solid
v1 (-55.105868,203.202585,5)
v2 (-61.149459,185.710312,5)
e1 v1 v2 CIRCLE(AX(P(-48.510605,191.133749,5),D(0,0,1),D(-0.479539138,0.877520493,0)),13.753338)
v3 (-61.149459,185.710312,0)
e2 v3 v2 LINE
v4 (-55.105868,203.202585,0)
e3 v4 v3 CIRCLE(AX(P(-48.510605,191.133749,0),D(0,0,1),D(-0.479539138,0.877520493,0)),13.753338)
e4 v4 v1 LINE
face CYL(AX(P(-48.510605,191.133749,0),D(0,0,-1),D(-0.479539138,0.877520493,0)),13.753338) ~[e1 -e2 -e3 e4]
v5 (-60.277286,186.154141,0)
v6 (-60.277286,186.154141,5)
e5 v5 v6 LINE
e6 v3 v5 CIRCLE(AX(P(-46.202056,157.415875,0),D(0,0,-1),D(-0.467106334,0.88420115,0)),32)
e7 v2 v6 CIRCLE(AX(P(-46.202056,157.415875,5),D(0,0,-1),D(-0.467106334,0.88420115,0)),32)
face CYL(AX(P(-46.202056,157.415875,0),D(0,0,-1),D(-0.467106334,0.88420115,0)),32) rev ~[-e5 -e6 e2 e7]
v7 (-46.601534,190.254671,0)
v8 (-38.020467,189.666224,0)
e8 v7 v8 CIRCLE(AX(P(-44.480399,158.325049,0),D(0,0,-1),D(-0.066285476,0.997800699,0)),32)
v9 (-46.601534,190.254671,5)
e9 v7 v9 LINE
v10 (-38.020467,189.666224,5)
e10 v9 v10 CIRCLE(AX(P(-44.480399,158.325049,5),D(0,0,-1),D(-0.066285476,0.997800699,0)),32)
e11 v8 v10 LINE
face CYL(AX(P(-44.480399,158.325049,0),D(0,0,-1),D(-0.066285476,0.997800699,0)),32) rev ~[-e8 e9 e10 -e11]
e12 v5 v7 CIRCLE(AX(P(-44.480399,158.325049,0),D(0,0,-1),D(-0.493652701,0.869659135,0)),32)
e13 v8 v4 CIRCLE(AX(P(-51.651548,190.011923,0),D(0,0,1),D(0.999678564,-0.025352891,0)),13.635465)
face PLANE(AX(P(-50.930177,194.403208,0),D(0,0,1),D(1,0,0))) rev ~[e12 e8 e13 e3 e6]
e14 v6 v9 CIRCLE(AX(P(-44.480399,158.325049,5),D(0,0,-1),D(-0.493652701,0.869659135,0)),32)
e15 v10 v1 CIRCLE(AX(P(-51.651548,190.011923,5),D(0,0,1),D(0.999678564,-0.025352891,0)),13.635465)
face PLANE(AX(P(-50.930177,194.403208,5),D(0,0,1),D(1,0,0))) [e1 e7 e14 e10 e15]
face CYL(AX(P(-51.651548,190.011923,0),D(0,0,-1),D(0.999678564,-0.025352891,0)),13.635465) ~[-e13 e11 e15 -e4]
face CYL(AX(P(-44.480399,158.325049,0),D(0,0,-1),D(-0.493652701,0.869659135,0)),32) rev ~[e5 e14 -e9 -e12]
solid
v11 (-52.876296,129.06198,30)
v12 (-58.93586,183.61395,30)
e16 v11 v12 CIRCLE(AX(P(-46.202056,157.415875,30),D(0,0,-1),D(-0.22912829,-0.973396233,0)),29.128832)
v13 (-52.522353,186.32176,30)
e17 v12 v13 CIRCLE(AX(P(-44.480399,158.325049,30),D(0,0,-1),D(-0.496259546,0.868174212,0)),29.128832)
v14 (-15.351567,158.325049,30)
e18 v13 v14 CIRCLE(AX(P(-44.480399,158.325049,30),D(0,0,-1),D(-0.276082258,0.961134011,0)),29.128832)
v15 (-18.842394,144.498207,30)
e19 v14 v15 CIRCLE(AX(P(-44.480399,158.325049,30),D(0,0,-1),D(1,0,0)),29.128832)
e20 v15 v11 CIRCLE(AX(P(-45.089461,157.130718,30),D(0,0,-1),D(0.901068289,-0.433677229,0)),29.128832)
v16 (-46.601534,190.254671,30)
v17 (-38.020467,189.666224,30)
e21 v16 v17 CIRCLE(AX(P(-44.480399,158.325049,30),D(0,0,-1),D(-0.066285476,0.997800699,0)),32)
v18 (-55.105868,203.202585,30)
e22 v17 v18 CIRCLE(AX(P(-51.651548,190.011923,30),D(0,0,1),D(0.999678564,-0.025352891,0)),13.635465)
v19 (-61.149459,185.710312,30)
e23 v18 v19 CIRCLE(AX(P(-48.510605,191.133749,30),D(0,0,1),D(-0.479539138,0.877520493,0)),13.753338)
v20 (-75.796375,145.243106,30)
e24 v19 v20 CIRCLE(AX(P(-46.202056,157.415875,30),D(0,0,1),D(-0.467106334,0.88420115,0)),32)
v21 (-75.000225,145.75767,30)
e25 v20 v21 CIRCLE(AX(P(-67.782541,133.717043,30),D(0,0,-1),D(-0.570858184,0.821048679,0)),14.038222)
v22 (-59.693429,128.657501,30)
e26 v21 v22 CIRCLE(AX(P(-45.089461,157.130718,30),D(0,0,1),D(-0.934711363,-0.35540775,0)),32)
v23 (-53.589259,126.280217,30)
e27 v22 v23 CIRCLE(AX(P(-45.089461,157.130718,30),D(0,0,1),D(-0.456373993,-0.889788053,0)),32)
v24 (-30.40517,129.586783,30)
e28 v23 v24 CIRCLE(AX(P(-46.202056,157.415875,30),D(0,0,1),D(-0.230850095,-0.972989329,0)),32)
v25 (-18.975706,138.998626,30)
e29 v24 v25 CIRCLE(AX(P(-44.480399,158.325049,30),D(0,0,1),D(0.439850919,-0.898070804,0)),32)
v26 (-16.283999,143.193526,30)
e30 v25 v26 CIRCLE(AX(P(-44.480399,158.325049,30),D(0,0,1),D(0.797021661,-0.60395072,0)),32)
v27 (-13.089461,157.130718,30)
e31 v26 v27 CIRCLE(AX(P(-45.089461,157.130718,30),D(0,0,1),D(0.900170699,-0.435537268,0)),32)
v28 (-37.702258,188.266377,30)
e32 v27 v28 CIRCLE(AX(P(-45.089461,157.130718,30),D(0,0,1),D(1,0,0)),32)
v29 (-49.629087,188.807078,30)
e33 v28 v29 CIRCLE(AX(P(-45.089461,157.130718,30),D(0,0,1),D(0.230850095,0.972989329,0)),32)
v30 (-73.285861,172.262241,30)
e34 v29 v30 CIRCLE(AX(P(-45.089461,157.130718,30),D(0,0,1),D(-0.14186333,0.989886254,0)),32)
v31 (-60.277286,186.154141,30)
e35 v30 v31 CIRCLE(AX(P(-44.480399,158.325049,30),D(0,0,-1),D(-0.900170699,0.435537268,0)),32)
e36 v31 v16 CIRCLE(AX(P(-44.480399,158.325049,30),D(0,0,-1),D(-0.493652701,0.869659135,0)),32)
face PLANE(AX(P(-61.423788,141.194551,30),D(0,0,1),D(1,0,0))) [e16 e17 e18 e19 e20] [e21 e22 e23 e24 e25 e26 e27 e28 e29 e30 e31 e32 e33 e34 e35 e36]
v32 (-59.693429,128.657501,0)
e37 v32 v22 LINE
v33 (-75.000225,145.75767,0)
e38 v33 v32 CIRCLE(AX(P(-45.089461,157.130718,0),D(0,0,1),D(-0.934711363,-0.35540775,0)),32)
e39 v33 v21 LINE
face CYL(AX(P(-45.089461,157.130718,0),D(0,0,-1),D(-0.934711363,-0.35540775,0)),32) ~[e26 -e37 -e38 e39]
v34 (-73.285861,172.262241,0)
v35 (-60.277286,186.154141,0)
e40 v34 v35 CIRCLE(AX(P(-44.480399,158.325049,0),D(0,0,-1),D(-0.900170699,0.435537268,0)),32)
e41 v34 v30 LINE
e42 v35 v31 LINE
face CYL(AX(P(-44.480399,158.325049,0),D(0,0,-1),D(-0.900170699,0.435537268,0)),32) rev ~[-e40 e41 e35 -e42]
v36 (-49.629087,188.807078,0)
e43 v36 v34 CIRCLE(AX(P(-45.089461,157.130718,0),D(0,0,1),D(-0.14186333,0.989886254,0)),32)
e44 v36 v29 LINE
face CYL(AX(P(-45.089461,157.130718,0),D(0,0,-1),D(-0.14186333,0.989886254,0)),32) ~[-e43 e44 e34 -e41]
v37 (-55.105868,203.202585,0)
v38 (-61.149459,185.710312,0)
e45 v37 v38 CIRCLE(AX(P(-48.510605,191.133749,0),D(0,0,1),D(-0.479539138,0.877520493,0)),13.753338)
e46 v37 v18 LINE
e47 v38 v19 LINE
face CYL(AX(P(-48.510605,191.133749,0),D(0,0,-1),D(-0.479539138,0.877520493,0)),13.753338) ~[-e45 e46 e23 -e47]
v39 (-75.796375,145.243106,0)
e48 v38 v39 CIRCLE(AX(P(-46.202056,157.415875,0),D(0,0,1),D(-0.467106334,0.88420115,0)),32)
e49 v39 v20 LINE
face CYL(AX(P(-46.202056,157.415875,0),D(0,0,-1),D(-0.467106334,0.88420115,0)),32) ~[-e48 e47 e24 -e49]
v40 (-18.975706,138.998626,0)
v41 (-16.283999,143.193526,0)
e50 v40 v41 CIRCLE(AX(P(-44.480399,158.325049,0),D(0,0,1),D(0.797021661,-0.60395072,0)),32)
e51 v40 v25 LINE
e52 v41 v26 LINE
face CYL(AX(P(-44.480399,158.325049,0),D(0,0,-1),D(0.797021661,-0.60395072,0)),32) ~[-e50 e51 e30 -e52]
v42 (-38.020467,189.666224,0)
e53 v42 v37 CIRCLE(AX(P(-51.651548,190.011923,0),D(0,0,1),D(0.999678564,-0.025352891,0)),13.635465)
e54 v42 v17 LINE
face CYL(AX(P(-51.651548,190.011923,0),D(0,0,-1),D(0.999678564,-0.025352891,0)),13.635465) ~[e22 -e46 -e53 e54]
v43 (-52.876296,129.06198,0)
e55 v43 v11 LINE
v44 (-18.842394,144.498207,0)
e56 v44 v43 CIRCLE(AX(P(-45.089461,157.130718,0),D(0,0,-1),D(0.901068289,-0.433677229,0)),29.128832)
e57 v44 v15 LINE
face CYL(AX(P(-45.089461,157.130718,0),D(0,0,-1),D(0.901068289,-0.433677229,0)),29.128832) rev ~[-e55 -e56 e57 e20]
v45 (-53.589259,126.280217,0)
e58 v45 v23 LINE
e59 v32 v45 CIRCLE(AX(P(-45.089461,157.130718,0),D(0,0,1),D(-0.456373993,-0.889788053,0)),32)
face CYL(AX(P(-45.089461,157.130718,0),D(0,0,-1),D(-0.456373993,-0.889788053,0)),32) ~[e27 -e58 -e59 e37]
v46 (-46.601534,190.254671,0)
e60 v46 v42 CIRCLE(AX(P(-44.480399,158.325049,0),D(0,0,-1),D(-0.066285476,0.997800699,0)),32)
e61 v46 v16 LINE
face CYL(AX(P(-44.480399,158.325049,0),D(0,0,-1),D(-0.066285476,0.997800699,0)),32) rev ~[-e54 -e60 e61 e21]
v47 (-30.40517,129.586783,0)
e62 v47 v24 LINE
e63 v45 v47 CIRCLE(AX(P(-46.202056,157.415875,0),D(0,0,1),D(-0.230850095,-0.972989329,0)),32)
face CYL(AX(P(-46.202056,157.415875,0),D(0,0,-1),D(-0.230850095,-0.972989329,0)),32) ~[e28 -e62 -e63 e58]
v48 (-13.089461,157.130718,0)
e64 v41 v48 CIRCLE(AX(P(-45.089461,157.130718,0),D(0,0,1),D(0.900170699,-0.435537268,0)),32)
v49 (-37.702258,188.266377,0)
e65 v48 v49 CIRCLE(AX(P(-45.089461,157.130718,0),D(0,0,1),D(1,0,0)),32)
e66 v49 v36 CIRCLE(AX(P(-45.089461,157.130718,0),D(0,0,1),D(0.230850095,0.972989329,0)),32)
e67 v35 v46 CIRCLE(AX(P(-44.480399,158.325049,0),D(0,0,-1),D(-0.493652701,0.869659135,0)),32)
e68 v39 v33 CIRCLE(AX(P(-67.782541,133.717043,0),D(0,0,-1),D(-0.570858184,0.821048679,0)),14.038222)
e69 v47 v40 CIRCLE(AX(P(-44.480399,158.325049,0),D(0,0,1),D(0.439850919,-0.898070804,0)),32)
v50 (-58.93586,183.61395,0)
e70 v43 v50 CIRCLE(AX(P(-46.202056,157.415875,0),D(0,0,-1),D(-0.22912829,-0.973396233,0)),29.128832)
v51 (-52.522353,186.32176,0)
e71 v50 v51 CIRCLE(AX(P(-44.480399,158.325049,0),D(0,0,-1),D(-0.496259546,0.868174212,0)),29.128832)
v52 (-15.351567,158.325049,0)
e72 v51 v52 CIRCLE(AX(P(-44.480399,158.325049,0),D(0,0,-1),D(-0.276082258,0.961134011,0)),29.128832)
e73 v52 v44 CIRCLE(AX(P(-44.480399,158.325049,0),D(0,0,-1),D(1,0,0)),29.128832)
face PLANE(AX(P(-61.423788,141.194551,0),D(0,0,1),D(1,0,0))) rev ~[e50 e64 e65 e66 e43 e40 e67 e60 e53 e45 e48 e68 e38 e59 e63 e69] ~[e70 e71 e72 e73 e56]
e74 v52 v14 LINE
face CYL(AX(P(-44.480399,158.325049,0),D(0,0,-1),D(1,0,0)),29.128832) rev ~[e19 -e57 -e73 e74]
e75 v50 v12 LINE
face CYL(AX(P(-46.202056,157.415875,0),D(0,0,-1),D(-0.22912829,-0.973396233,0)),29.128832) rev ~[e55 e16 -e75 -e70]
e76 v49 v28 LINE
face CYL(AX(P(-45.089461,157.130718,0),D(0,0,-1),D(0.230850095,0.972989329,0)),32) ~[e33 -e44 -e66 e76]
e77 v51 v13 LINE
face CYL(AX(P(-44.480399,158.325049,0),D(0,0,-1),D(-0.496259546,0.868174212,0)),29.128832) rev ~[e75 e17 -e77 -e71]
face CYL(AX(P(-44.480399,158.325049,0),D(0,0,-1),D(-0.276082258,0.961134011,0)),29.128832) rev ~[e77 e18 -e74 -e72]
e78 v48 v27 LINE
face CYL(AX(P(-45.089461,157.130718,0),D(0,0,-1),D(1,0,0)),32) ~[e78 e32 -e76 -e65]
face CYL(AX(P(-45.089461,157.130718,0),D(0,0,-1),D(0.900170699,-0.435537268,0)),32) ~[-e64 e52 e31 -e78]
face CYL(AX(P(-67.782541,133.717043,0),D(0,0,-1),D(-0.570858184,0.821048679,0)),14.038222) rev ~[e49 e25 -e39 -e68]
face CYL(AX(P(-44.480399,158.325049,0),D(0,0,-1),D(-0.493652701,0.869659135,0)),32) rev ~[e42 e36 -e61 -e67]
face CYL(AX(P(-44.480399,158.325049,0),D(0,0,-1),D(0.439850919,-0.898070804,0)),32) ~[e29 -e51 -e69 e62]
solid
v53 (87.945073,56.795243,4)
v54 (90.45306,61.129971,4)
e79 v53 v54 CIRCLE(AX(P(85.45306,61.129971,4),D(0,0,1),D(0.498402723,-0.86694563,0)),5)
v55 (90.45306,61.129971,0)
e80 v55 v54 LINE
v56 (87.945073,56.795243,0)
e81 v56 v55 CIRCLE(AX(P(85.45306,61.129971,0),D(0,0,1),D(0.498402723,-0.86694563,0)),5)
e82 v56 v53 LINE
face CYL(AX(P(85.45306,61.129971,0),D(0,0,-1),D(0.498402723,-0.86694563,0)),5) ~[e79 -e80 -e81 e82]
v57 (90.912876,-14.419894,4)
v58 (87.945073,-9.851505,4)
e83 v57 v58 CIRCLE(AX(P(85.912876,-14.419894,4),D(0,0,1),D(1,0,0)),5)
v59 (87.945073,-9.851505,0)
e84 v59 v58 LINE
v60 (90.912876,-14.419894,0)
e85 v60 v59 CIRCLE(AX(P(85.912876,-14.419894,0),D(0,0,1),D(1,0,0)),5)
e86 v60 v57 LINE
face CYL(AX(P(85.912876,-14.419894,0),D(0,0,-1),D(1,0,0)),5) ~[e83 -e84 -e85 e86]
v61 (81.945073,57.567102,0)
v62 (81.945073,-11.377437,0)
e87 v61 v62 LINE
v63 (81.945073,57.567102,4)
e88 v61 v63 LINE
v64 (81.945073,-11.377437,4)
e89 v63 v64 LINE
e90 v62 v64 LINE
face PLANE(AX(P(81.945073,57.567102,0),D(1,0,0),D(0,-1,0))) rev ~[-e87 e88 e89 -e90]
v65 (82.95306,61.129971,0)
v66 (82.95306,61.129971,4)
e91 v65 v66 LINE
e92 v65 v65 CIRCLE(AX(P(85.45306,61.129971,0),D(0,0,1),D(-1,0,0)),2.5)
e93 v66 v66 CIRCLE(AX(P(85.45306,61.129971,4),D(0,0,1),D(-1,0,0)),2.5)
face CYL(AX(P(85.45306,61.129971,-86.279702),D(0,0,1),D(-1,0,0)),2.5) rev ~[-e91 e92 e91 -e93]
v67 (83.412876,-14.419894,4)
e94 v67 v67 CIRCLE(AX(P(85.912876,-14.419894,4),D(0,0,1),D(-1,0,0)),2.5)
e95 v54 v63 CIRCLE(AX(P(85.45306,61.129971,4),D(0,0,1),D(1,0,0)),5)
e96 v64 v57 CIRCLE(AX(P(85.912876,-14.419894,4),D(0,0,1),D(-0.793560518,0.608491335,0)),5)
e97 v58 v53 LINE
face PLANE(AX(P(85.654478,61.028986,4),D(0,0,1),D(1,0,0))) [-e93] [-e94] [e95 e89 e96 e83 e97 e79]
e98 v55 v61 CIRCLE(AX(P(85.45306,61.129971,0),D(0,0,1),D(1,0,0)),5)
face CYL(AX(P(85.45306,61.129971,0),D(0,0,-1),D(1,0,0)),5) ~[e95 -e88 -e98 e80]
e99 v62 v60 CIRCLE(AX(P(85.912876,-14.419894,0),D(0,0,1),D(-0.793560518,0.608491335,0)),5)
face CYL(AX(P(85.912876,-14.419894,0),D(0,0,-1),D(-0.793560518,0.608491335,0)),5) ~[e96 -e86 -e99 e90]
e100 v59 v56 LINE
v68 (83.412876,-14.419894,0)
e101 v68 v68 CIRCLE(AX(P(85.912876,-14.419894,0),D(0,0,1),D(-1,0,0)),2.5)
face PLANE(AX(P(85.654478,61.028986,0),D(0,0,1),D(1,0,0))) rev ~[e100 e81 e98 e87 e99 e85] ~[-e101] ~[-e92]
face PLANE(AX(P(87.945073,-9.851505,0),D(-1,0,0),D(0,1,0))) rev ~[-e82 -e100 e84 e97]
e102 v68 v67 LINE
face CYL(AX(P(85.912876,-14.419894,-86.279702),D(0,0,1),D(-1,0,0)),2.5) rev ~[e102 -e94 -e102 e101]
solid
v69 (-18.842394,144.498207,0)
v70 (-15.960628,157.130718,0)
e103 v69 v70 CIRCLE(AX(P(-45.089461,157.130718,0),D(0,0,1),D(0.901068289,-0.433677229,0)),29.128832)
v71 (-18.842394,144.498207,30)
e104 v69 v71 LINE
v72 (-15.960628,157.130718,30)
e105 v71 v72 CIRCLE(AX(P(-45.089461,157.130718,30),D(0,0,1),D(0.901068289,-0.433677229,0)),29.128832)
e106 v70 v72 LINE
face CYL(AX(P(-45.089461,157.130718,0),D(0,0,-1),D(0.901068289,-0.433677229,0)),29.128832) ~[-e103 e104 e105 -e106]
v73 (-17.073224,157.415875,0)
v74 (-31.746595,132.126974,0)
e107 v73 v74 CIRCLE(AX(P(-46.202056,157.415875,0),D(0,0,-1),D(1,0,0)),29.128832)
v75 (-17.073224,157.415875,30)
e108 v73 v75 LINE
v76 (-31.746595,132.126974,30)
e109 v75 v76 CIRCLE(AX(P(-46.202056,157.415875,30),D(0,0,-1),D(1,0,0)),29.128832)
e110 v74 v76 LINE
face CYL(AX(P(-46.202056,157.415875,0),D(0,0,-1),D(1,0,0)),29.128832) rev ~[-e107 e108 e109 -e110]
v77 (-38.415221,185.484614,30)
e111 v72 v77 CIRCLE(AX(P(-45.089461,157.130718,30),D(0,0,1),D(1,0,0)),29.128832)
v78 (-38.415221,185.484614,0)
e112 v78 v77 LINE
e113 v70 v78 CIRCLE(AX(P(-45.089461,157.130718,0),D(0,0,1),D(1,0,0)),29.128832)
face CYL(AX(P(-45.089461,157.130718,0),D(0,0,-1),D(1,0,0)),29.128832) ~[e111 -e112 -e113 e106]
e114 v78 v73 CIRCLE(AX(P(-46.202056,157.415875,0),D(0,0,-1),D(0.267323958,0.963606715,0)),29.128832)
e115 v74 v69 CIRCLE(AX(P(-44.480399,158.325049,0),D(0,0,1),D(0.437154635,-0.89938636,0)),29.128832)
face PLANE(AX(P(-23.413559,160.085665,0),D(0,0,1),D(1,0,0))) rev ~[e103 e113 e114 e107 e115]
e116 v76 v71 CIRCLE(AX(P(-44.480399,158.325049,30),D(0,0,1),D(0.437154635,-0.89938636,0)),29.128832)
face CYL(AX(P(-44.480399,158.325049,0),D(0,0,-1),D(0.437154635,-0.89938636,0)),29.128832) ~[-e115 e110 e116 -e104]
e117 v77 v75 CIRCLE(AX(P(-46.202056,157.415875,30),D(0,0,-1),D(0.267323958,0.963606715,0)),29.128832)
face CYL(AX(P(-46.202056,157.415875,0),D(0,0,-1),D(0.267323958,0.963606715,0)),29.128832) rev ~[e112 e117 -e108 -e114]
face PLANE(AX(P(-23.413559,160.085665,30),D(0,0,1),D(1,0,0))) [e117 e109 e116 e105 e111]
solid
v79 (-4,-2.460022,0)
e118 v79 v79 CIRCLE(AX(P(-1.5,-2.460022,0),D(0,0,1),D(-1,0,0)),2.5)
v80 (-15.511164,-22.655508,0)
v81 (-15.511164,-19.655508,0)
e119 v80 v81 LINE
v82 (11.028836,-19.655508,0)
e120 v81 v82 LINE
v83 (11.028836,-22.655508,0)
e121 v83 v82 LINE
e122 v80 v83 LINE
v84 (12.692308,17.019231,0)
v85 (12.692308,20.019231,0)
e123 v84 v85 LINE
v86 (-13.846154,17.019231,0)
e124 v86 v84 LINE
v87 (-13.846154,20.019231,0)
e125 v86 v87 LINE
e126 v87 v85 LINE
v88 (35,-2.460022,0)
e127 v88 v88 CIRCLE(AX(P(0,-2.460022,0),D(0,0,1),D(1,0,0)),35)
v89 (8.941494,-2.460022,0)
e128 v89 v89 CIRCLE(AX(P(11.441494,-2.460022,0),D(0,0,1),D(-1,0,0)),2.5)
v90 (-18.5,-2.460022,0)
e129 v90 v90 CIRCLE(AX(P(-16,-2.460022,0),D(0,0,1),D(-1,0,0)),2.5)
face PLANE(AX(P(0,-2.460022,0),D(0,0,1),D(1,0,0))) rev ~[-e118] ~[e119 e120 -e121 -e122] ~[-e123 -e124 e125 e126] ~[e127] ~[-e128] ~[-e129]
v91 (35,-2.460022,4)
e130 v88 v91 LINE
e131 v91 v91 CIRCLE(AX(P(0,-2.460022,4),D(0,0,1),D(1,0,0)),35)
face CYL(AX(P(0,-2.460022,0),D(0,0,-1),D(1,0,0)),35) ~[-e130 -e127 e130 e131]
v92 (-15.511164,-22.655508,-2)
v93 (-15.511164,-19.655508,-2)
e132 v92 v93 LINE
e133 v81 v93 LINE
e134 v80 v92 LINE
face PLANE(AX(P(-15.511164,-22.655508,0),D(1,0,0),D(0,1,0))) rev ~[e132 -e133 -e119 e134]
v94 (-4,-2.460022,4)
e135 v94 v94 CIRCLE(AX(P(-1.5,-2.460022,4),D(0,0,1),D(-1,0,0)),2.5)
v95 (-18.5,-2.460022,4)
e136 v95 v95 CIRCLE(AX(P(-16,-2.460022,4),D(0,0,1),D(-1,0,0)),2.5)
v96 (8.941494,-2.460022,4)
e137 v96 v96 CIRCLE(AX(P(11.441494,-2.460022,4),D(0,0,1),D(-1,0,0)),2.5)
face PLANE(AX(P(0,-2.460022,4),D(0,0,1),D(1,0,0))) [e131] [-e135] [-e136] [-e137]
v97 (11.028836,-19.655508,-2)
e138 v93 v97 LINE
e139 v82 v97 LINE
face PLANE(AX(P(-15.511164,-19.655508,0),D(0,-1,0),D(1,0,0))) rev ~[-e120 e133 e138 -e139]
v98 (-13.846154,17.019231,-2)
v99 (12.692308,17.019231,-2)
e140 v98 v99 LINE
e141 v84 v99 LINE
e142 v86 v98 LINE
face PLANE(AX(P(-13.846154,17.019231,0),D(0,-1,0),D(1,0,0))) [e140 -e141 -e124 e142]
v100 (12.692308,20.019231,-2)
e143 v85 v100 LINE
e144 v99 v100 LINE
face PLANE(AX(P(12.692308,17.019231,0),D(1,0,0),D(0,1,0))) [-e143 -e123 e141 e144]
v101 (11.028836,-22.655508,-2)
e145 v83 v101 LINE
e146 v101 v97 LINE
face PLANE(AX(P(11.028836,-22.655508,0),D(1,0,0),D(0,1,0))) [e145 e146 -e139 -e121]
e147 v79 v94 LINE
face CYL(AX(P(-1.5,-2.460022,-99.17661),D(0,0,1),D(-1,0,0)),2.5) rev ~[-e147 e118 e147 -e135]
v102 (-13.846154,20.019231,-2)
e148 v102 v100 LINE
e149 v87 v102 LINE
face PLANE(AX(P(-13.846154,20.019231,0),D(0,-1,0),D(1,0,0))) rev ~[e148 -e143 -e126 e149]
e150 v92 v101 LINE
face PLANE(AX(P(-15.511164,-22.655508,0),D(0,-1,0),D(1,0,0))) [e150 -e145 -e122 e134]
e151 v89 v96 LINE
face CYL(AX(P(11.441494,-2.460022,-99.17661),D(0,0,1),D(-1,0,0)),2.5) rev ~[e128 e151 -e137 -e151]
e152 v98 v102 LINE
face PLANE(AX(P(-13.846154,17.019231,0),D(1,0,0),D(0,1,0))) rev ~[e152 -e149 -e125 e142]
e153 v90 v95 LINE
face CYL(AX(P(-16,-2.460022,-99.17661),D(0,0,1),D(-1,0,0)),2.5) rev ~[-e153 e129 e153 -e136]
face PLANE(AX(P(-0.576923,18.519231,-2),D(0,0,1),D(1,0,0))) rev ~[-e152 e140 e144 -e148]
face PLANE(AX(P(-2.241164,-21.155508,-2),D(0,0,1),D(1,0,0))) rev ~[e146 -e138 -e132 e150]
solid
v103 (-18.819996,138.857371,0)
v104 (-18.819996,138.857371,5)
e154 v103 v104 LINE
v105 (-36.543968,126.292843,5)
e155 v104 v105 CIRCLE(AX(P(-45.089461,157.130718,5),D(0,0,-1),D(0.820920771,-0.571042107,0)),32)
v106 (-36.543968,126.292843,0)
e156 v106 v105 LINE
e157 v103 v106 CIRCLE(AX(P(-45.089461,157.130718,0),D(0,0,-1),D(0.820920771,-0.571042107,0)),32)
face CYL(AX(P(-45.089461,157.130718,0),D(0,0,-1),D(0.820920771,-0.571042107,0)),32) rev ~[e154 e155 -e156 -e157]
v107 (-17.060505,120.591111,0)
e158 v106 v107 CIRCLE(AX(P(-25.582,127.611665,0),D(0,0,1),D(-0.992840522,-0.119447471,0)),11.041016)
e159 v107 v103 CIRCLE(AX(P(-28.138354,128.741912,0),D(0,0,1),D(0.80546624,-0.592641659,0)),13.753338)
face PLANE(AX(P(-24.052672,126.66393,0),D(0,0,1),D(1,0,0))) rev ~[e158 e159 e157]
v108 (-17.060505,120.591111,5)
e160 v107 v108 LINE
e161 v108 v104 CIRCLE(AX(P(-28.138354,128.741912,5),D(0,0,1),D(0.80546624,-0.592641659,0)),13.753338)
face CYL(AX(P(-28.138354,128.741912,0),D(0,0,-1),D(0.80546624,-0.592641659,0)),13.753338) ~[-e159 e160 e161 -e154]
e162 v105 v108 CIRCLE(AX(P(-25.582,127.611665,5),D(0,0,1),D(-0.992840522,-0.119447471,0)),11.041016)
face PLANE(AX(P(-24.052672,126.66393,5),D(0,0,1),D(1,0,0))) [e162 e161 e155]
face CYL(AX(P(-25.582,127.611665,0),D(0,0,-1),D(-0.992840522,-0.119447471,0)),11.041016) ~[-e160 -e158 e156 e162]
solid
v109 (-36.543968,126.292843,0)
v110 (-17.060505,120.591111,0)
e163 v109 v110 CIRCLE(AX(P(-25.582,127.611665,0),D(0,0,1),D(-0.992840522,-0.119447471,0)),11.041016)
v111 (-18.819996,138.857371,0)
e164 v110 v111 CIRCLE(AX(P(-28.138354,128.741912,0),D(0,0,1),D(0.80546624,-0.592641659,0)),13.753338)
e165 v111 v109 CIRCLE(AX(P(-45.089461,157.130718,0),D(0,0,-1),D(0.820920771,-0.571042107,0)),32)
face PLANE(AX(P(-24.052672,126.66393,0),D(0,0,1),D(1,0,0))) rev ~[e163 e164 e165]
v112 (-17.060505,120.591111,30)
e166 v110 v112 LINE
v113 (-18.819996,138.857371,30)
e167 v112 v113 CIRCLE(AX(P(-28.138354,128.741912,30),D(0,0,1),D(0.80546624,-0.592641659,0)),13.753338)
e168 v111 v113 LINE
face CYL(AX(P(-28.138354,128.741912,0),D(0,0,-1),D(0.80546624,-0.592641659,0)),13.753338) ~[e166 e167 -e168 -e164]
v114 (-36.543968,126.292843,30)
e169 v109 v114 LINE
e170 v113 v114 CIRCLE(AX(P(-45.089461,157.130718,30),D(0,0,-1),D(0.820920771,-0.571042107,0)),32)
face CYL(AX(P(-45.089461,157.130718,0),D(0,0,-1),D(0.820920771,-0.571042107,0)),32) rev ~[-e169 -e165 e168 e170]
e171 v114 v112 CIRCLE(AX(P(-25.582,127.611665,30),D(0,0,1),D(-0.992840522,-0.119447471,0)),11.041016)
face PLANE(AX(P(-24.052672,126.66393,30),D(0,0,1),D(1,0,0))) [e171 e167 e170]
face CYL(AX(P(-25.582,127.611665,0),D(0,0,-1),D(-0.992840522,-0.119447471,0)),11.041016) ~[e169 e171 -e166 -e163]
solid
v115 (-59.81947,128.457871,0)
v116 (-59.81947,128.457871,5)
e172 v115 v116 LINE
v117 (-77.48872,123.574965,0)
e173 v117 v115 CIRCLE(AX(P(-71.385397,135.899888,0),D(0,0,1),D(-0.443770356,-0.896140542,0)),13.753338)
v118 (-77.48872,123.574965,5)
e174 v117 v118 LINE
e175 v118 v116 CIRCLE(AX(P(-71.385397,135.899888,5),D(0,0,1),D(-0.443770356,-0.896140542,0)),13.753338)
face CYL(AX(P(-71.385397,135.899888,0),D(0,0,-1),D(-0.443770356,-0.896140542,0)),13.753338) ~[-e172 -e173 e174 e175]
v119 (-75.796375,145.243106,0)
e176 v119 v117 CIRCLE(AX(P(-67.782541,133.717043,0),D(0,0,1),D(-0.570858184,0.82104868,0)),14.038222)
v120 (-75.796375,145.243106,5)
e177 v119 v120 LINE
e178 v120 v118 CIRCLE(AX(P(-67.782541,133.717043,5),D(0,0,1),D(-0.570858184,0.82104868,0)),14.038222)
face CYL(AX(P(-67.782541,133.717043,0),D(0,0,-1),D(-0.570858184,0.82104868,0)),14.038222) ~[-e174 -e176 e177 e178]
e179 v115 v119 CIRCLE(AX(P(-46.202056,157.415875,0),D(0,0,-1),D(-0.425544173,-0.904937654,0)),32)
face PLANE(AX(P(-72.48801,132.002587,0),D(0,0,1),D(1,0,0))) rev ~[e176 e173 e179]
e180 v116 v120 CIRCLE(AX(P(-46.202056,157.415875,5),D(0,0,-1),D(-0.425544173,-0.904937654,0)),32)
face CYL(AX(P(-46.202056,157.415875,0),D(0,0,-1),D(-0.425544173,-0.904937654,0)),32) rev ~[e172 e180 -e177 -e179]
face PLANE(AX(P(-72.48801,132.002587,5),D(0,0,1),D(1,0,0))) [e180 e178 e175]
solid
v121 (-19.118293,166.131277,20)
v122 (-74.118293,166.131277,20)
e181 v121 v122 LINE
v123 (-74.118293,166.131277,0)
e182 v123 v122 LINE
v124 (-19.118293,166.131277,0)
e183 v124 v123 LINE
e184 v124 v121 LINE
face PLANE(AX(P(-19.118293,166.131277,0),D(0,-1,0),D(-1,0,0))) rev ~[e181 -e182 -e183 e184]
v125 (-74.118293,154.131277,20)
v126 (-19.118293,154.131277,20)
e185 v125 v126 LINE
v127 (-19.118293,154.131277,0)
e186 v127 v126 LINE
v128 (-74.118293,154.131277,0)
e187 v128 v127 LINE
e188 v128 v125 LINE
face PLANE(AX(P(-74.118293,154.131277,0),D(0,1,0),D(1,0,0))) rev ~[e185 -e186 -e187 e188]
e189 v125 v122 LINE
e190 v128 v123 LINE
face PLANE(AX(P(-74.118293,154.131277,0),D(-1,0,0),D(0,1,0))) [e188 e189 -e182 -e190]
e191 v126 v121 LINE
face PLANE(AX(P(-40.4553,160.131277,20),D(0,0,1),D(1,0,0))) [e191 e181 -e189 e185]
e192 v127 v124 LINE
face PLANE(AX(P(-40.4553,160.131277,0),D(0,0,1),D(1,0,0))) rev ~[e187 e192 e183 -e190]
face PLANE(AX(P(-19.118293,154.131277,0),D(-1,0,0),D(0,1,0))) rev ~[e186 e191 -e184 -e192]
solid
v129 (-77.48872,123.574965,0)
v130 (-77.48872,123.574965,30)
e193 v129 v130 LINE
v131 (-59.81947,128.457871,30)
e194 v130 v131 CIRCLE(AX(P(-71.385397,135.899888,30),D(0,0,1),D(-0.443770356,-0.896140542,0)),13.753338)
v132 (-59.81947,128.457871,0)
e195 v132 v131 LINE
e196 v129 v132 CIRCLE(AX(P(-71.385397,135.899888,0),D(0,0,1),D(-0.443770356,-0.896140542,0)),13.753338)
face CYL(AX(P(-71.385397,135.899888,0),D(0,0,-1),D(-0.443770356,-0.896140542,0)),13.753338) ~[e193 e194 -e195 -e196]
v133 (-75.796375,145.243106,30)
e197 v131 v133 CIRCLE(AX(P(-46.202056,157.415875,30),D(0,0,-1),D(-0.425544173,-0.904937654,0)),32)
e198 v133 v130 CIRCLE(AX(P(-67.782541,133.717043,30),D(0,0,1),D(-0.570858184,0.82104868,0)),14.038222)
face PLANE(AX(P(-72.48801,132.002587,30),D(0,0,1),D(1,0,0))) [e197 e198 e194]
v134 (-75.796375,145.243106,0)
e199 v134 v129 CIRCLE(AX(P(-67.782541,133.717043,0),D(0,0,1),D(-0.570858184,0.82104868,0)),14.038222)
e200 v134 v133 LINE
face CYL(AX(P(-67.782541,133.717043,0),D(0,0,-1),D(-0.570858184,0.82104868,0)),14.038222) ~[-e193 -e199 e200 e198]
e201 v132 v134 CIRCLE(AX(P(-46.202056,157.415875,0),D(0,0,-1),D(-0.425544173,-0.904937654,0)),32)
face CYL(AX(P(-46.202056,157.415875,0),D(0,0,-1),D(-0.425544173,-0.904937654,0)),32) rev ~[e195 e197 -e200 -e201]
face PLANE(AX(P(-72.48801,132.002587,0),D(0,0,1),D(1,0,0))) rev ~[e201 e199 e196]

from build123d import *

# Parameters (mm, degrees)
F0_R      = 35
F0_W      = 26.54
F0_H      = 3
F0_R_2    = 1.5
F0_R_3    = 3
F0_W_2    = 26.5384623781
F1_DEPTH  = 4
F2_DEPTH  = 2
F3_D      = 5
F5_DEPTH  = 4
F6_D      = 5
F7_W      = 2
F7_H      = 65
F8_DEPTH  = 3
F10_DEPTH = 30
F11_DEPTH = 5
F12_W     = 42.6740131952
F12_H     = 12
F12_W_2   = 12.3259868048
F13_DEPTH = 20


with BuildPart() as f1:
    # F0 (on Top) → F1 (new body)
    with BuildSketch(Plane.XY):
        with Locations((0, -2.4600220768)):
            Circle(F0_R)
        with Locations((-2.2411635104, -21.1555075496)):
            Rectangle(F0_W, F0_H, mode=Mode.SUBTRACT)
        with Locations((-16, -2.4600220768)):
            Circle(F0_R_2, mode=Mode.SUBTRACT)
        with Locations((-1.5, -2.4600220768)):
            Circle(F0_R_3, mode=Mode.SUBTRACT)
        with Locations((-0.5769231357, 18.5192308724)):
            Rectangle(F0_W_2, F0_H, mode=Mode.SUBTRACT)
        with Locations((11.4414943382, -2.4600220768)):
            Circle(F0_R_2, mode=Mode.SUBTRACT)
        with Locations((-2.2411635104, -21.1555075496)):
            Rectangle(F0_W, F0_H)
        with Locations((-0.5769231357, 18.5192308724)):
            Rectangle(F0_W_2, F0_H)
        with Locations((-1.5, -2.4600220768)):
            Circle(F0_R_3)
        with Locations((11.4414943382, -2.4600220768)):
            Circle(F0_R_2)
        with Locations((-16, -2.4600220768)):
            Circle(F0_R_2)
    extrude(amount=F1_DEPTH)

    # F0 (on Top) → F2 (join)
    with BuildSketch(Plane.XY):
        with Locations((-2.2411635104, -21.1555075496)):
            Rectangle(F0_W, F0_H)
        with Locations((-0.5769231357, 18.5192308724)):
            Rectangle(F0_W_2, F0_H)
    extrude(amount=-F2_DEPTH)

    # F3 (through all)
    with Locations(Plane(origin=(0, 0, 0), x_dir=(1, 0, 0), z_dir=(0, 0, -1))):
        with Locations((-1.5, 2.4600220768), (11.4414943382, 2.4600220768), (-16, 2.4600220768)):
            Hole(F3_D / 2)


with BuildPart() as f5:
    # F4 (on Top) → F5 (new body)
    with BuildSketch(Plane.XY):
        with BuildLine():
            ThreePointArc((87.9450732429, 56.7952425036), (89.7808805629, 58.6259806462), (90.4530596292, 61.1299706553))
            ThreePointArc((90.4530596292, 61.1299706553), (83.5217300265, 65.7419079885), (81.9450732429, 57.5671022163))
            Line((81.9450732429, 57.5671022163), (87.9450732429, 57.5671022163))
            Line((87.9450732429, 57.5671022163), (87.9450732429, 56.7952425036))
        make_face()
        with BuildLine():
            Line((81.9450732429, -12.4328977837), (81.9450732429, -11.3774370589))
            ThreePointArc((81.9450732429, -11.3774370589), (84.3064843691, -19.1548178593), (90.9128758311, -14.4198937342))
            ThreePointArc((90.9128758311, -14.4198937342), (90.105785743, -11.6960166315), (87.9450732429, -9.8515052131))
            Line((87.9450732429, -9.8515052131), (87.9450732429, -12.4328977837))
            Line((87.9450732429, -12.4328977837), (81.9450732429, -12.4328977837))
        make_face()
        with BuildLine():
            ThreePointArc((87.9450732429, 56.7952425036), (84.8151003651, 56.1708368622), (81.9450732429, 57.5671022163))
            Line((81.9450732429, 57.5671022163), (81.9450732429, -11.3774370589))
            ThreePointArc((81.9450732429, -11.3774370589), (84.6804964864, -9.5741490906), (87.9450732429, -9.8515052131))
            Line((87.9450732429, -9.8515052131), (87.9450732429, 56.7952425036))
        make_face()
        with BuildLine():
            Line((87.9450732429, 57.5671022163), (81.9450732429, 57.5671022163))
            ThreePointArc((81.9450732429, 57.5671022163), (84.8151003651, 56.1708368622), (87.9450732429, 56.7952425036))
            Line((87.9450732429, 56.7952425036), (87.9450732429, 57.5671022163))
        make_face()
        with BuildLine():
            ThreePointArc((87.9450732429, -9.8515052131), (84.6804964864, -9.5741490906), (81.9450732429, -11.3774370589))
            Line((81.9450732429, -11.3774370589), (81.9450732429, -12.4328977837))
            Line((81.9450732429, -12.4328977837), (87.9450732429, -12.4328977837))
            Line((87.9450732429, -12.4328977837), (87.9450732429, -9.8515052131))
        make_face()
    extrude(amount=F5_DEPTH)

    # F6 (through all)
    with Locations(Plane(origin=(0, 0, 0), x_dir=(1, 0, 0), z_dir=(0, 0, -1))):
        with Locations((85.4530596292, -61.1299706553), (85.9128758311, 14.4198937342)):
            Hole(F6_D / 2)

    # F7 (on Top) → F8 (join)
    with BuildSketch(Plane.XY):
        with Locations((83.2414569196, 23.0664638802)):
            Rectangle(F7_W, F7_H)
    extrude(amount=F8_DEPTH)


with BuildPart() as f10:
    # F9 (on Top) → F10 (new body)
    with BuildSketch(Plane.XY):
        with BuildLine():
            ThreePointArc((-73.2858614672, 172.2622414718), (-77.0227304851, 159.1962191884), (-75.000224512, 145.7576702356))
            ThreePointArc((-75.000224512, 145.7576702356), (-68.9325789571, 135.7881382146), (-59.6934286842, 128.657500548))
            ThreePointArc((-59.6934286842, 128.657500548), (-56.7023361178, 127.3122486294), (-53.5892591718, 126.2802169468))
            ThreePointArc((-53.5892591718, 126.2802169468), (-41.6838663684, 125.7364505743), (-30.4051696922, 129.586783152))
            ThreePointArc((-30.4051696922, 129.586783152), (-67.0534721321, 135.6434181391), (-73.2858614672, 172.2622414718))
        make_face()
        with BuildLine():
            ThreePointArc((-75.7963746055, 145.2431060979), (-75.4026441809, 145.5071103051), (-75.000224512, 145.7576702356))
            ThreePointArc((-75.000224512, 145.7576702356), (-77.0227304851, 159.1962191884), (-73.2858614672, 172.2622414718))
            ThreePointArc((-73.2858614672, 172.2622414718), (-67.8382371628, 180.1976664827), (-60.2772855271, 186.1541411976))
            ThreePointArc((-60.2772855271, 186.1541411976), (-60.7150688845, 185.9355609592), (-61.1494588106, 185.7103122505))
            ThreePointArc((-61.1494588106, 185.7103122505), (-76.291754107, 168.3067007621), (-75.7963746055, 145.2431060979))
        make_face()
        with BuildLine():
            ThreePointArc((-61.1494588106, 185.7103122505), (-60.7150688845, 185.9355609592), (-60.2772855271, 186.1541411976))
            ThreePointArc((-60.2772855271, 186.1541411976), (-53.6710172386, 188.9768439079), (-46.6015343342, 190.2546712658))
            ThreePointArc((-46.6015343342, 190.2546712658), (-42.2911393785, 190.2500726443), (-38.0204665002, 189.6662242149))
            ThreePointArc((-38.0204665002, 189.6662242149), (-43.1839698715, 200.6995796457), (-55.105868423, 203.2025846503))
            ThreePointArc((-55.105868423, 203.2025846503), (-61.5099400927, 195.6250269593), (-61.1494588106, 185.7103122505))
        make_face()
        with BuildLine():
            ThreePointArc((-14.2020561308, 157.4158754629), (-18.5479392037, 141.3146389581), (-30.4051696922, 129.586783152))
            ThreePointArc((-30.4051696922, 129.586783152), (-24.1386129674, 133.6225846899), (-18.9757059518, 138.9986258344))
            ThreePointArc((-18.9757059518, 138.9986258344), (-17.5480549257, 141.0435895186), (-16.2839985307, 143.1935256462))
            ThreePointArc((-16.2839985307, 143.1935256462), (-13.8983179669, 149.9814104366), (-13.0894609094, 157.1307182312))
            ThreePointArc((-13.0894609094, 157.1307182312), (-19.9857709683, 176.9752326204), (-37.7022578684, 188.2663767473))
            ThreePointArc((-37.7022578684, 188.2663767473), (-20.7462754081, 176.806678123), (-14.2020561308, 157.4158754629))
        make_face()
        with BuildLine():
            ThreePointArc((-49.6290874558, 188.807078357), (-63.4291657743, 183.3538993019), (-73.2858614672, 172.2622414718))
            ThreePointArc((-73.2858614672, 172.2622414718), (-67.0534721321, 135.6434181391), (-30.4051696922, 129.586783152))
            ThreePointArc((-30.4051696922, 129.586783152), (-18.5479392037, 141.3146389581), (-14.2020561308, 157.4158754629))
            ThreePointArc((-14.2020561308, 157.4158754629), (-20.7462754081, 176.806678123), (-37.7022578684, 188.2663767473))
            ThreePointArc((-37.7022578684, 188.2663767473), (-43.6402326559, 189.0978847849), (-49.6290874558, 188.807078357))
        make_face()
        with BuildLine():
            ThreePointArc((-58.9358602723, 183.613950101), (-55.8102922922, 185.1601453587), (-52.5223529313, 186.3217604982))
            ThreePointArc((-52.5223529313, 186.3217604982), (-26.9556144077, 181.5924252869), (-15.3515665912, 158.3250488867))
            ThreePointArc((-15.3515665912, 158.3250488867), (-16.2377535984, 151.1947011831), (-18.8423936526, 144.4982068783))
            ThreePointArc((-18.8423936526, 144.4982068783), (-33.0576562429, 130.6029109503), (-52.8762957046, 129.0619796323))
            ThreePointArc((-52.8762957046, 129.0619796323), (-75.1528317805, 154.2000595569), (-58.9358602723, 183.613950101))
        make_face(mode=Mode.SUBTRACT)
    extrude(amount=F10_DEPTH)


with BuildPart() as f10b:
    # F9 (on Top) → F10, piece 2 (new body)
    with BuildSketch(Plane.XY):
        with BuildLine():
            ThreePointArc((-59.8194696617, 128.4578705467), (-69.380698862, 135.3534521794), (-75.7963746055, 145.2431060979))
            ThreePointArc((-75.7963746055, 145.2431060979), (-81.7781403803, 134.8101403643), (-77.488720417, 123.5749647021))
            ThreePointArc((-77.488720417, 123.5749647021), (-67.7219692241, 122.6434333215), (-59.8194696617, 128.4578705467))
        make_face()
    extrude(amount=F10_DEPTH)


with BuildPart() as f10c:
    # F9 (on Top) → F10, piece 3 (new body)
    with BuildSketch(Plane.XY):
        with BuildLine():
            ThreePointArc((-18.8199962523, 138.8573707921), (-26.5830521793, 131.0249174215), (-36.5439675777, 126.292843082))
            ThreePointArc((-36.5439675777, 126.292843082), (-28.6830339005, 117.0150793111), (-17.0605052263, 120.5911114812))
            ThreePointArc((-17.0605052263, 120.5911114812), (-14.4483808733, 130.0605942776), (-18.8199962523, 138.8573707921))
        make_face()
    extrude(amount=F10_DEPTH)


with BuildPart() as f10d:
    # F9 (on Top) → F10, piece 4 (new body)
    with BuildSketch(Plane.XY):
        with BuildLine():
            ThreePointArc((-31.746594947, 132.1269742486), (-24.3220064999, 137.2982067343), (-18.8423936526, 144.4982068783))
            ThreePointArc((-18.8423936526, 144.4982068783), (-16.6902064444, 150.6521976828), (-15.960628412, 157.1307182312))
            ThreePointArc((-15.960628412, 157.1307182312), (-22.2541626931, 175.2149112747), (-38.4152213356, 185.4846140618))
            ThreePointArc((-38.4152213356, 185.4846140618), (-23.0146642001, 175.0463529979), (-17.0732236334, 157.4158754629))
            ThreePointArc((-17.0732236334, 157.4158754629), (-21.0072194558, 142.7970831878), (-31.746594947, 132.1269742486))
        make_face()
    extrude(amount=F10_DEPTH)


with BuildPart() as f11:
    # F9 (on Top) → F11 (new body)
    with BuildSketch(Plane.XY):
        with BuildLine():
            ThreePointArc((-59.8194696617, 128.4578705467), (-69.380698862, 135.3534521794), (-75.7963746055, 145.2431060979))
            ThreePointArc((-75.7963746055, 145.2431060979), (-81.7781403803, 134.8101403643), (-77.488720417, 123.5749647021))
            ThreePointArc((-77.488720417, 123.5749647021), (-67.7219692241, 122.6434333215), (-59.8194696617, 128.4578705467))
        make_face()
    extrude(amount=F11_DEPTH)


with BuildPart() as f11b:
    # F9 (on Top) → F11, piece 2 (new body)
    with BuildSketch(Plane.XY):
        with BuildLine():
            ThreePointArc((-18.8199962523, 138.8573707921), (-26.5830521793, 131.0249174215), (-36.5439675777, 126.292843082))
            ThreePointArc((-36.5439675777, 126.292843082), (-28.6830339005, 117.0150793111), (-17.0605052263, 120.5911114812))
            ThreePointArc((-17.0605052263, 120.5911114812), (-14.4483808733, 130.0605942776), (-18.8199962523, 138.8573707921))
        make_face()
    extrude(amount=F11_DEPTH)


with BuildPart() as f11c:
    # F9 (on Top) → F11, piece 3 (new body)
    with BuildSketch(Plane.XY):
        with BuildLine():
            ThreePointArc((-61.1494588106, 185.7103122505), (-60.7150688845, 185.9355609592), (-60.2772855271, 186.1541411976))
            ThreePointArc((-60.2772855271, 186.1541411976), (-53.6710172386, 188.9768439079), (-46.6015343342, 190.2546712658))
            ThreePointArc((-46.6015343342, 190.2546712658), (-42.2911393785, 190.2500726443), (-38.0204665002, 189.6662242149))
            ThreePointArc((-38.0204665002, 189.6662242149), (-43.1839698715, 200.6995796457), (-55.105868423, 203.2025846503))
            ThreePointArc((-55.105868423, 203.2025846503), (-61.5099400927, 195.6250269593), (-61.1494588106, 185.7103122505))
        make_face()
    extrude(amount=F11_DEPTH)


with BuildPart() as f13:
    # F12 (on Top) → F13 (new body)
    with BuildSketch(Plane.XY):
        with Locations((-40.4553000044, 160.1312771357)):
            Rectangle(F12_W, F12_H)
        with Locations((-67.9553000044, 160.1312771357)):
            Rectangle(F12_W_2, F12_H)
    extrude(amount=F13_DEPTH)


solid = Compound([f1.part, f5.part, f10.part, f10b.part, f10c.part, f10d.part, f11.part, f11b.part, f11c.part, f13.part])
